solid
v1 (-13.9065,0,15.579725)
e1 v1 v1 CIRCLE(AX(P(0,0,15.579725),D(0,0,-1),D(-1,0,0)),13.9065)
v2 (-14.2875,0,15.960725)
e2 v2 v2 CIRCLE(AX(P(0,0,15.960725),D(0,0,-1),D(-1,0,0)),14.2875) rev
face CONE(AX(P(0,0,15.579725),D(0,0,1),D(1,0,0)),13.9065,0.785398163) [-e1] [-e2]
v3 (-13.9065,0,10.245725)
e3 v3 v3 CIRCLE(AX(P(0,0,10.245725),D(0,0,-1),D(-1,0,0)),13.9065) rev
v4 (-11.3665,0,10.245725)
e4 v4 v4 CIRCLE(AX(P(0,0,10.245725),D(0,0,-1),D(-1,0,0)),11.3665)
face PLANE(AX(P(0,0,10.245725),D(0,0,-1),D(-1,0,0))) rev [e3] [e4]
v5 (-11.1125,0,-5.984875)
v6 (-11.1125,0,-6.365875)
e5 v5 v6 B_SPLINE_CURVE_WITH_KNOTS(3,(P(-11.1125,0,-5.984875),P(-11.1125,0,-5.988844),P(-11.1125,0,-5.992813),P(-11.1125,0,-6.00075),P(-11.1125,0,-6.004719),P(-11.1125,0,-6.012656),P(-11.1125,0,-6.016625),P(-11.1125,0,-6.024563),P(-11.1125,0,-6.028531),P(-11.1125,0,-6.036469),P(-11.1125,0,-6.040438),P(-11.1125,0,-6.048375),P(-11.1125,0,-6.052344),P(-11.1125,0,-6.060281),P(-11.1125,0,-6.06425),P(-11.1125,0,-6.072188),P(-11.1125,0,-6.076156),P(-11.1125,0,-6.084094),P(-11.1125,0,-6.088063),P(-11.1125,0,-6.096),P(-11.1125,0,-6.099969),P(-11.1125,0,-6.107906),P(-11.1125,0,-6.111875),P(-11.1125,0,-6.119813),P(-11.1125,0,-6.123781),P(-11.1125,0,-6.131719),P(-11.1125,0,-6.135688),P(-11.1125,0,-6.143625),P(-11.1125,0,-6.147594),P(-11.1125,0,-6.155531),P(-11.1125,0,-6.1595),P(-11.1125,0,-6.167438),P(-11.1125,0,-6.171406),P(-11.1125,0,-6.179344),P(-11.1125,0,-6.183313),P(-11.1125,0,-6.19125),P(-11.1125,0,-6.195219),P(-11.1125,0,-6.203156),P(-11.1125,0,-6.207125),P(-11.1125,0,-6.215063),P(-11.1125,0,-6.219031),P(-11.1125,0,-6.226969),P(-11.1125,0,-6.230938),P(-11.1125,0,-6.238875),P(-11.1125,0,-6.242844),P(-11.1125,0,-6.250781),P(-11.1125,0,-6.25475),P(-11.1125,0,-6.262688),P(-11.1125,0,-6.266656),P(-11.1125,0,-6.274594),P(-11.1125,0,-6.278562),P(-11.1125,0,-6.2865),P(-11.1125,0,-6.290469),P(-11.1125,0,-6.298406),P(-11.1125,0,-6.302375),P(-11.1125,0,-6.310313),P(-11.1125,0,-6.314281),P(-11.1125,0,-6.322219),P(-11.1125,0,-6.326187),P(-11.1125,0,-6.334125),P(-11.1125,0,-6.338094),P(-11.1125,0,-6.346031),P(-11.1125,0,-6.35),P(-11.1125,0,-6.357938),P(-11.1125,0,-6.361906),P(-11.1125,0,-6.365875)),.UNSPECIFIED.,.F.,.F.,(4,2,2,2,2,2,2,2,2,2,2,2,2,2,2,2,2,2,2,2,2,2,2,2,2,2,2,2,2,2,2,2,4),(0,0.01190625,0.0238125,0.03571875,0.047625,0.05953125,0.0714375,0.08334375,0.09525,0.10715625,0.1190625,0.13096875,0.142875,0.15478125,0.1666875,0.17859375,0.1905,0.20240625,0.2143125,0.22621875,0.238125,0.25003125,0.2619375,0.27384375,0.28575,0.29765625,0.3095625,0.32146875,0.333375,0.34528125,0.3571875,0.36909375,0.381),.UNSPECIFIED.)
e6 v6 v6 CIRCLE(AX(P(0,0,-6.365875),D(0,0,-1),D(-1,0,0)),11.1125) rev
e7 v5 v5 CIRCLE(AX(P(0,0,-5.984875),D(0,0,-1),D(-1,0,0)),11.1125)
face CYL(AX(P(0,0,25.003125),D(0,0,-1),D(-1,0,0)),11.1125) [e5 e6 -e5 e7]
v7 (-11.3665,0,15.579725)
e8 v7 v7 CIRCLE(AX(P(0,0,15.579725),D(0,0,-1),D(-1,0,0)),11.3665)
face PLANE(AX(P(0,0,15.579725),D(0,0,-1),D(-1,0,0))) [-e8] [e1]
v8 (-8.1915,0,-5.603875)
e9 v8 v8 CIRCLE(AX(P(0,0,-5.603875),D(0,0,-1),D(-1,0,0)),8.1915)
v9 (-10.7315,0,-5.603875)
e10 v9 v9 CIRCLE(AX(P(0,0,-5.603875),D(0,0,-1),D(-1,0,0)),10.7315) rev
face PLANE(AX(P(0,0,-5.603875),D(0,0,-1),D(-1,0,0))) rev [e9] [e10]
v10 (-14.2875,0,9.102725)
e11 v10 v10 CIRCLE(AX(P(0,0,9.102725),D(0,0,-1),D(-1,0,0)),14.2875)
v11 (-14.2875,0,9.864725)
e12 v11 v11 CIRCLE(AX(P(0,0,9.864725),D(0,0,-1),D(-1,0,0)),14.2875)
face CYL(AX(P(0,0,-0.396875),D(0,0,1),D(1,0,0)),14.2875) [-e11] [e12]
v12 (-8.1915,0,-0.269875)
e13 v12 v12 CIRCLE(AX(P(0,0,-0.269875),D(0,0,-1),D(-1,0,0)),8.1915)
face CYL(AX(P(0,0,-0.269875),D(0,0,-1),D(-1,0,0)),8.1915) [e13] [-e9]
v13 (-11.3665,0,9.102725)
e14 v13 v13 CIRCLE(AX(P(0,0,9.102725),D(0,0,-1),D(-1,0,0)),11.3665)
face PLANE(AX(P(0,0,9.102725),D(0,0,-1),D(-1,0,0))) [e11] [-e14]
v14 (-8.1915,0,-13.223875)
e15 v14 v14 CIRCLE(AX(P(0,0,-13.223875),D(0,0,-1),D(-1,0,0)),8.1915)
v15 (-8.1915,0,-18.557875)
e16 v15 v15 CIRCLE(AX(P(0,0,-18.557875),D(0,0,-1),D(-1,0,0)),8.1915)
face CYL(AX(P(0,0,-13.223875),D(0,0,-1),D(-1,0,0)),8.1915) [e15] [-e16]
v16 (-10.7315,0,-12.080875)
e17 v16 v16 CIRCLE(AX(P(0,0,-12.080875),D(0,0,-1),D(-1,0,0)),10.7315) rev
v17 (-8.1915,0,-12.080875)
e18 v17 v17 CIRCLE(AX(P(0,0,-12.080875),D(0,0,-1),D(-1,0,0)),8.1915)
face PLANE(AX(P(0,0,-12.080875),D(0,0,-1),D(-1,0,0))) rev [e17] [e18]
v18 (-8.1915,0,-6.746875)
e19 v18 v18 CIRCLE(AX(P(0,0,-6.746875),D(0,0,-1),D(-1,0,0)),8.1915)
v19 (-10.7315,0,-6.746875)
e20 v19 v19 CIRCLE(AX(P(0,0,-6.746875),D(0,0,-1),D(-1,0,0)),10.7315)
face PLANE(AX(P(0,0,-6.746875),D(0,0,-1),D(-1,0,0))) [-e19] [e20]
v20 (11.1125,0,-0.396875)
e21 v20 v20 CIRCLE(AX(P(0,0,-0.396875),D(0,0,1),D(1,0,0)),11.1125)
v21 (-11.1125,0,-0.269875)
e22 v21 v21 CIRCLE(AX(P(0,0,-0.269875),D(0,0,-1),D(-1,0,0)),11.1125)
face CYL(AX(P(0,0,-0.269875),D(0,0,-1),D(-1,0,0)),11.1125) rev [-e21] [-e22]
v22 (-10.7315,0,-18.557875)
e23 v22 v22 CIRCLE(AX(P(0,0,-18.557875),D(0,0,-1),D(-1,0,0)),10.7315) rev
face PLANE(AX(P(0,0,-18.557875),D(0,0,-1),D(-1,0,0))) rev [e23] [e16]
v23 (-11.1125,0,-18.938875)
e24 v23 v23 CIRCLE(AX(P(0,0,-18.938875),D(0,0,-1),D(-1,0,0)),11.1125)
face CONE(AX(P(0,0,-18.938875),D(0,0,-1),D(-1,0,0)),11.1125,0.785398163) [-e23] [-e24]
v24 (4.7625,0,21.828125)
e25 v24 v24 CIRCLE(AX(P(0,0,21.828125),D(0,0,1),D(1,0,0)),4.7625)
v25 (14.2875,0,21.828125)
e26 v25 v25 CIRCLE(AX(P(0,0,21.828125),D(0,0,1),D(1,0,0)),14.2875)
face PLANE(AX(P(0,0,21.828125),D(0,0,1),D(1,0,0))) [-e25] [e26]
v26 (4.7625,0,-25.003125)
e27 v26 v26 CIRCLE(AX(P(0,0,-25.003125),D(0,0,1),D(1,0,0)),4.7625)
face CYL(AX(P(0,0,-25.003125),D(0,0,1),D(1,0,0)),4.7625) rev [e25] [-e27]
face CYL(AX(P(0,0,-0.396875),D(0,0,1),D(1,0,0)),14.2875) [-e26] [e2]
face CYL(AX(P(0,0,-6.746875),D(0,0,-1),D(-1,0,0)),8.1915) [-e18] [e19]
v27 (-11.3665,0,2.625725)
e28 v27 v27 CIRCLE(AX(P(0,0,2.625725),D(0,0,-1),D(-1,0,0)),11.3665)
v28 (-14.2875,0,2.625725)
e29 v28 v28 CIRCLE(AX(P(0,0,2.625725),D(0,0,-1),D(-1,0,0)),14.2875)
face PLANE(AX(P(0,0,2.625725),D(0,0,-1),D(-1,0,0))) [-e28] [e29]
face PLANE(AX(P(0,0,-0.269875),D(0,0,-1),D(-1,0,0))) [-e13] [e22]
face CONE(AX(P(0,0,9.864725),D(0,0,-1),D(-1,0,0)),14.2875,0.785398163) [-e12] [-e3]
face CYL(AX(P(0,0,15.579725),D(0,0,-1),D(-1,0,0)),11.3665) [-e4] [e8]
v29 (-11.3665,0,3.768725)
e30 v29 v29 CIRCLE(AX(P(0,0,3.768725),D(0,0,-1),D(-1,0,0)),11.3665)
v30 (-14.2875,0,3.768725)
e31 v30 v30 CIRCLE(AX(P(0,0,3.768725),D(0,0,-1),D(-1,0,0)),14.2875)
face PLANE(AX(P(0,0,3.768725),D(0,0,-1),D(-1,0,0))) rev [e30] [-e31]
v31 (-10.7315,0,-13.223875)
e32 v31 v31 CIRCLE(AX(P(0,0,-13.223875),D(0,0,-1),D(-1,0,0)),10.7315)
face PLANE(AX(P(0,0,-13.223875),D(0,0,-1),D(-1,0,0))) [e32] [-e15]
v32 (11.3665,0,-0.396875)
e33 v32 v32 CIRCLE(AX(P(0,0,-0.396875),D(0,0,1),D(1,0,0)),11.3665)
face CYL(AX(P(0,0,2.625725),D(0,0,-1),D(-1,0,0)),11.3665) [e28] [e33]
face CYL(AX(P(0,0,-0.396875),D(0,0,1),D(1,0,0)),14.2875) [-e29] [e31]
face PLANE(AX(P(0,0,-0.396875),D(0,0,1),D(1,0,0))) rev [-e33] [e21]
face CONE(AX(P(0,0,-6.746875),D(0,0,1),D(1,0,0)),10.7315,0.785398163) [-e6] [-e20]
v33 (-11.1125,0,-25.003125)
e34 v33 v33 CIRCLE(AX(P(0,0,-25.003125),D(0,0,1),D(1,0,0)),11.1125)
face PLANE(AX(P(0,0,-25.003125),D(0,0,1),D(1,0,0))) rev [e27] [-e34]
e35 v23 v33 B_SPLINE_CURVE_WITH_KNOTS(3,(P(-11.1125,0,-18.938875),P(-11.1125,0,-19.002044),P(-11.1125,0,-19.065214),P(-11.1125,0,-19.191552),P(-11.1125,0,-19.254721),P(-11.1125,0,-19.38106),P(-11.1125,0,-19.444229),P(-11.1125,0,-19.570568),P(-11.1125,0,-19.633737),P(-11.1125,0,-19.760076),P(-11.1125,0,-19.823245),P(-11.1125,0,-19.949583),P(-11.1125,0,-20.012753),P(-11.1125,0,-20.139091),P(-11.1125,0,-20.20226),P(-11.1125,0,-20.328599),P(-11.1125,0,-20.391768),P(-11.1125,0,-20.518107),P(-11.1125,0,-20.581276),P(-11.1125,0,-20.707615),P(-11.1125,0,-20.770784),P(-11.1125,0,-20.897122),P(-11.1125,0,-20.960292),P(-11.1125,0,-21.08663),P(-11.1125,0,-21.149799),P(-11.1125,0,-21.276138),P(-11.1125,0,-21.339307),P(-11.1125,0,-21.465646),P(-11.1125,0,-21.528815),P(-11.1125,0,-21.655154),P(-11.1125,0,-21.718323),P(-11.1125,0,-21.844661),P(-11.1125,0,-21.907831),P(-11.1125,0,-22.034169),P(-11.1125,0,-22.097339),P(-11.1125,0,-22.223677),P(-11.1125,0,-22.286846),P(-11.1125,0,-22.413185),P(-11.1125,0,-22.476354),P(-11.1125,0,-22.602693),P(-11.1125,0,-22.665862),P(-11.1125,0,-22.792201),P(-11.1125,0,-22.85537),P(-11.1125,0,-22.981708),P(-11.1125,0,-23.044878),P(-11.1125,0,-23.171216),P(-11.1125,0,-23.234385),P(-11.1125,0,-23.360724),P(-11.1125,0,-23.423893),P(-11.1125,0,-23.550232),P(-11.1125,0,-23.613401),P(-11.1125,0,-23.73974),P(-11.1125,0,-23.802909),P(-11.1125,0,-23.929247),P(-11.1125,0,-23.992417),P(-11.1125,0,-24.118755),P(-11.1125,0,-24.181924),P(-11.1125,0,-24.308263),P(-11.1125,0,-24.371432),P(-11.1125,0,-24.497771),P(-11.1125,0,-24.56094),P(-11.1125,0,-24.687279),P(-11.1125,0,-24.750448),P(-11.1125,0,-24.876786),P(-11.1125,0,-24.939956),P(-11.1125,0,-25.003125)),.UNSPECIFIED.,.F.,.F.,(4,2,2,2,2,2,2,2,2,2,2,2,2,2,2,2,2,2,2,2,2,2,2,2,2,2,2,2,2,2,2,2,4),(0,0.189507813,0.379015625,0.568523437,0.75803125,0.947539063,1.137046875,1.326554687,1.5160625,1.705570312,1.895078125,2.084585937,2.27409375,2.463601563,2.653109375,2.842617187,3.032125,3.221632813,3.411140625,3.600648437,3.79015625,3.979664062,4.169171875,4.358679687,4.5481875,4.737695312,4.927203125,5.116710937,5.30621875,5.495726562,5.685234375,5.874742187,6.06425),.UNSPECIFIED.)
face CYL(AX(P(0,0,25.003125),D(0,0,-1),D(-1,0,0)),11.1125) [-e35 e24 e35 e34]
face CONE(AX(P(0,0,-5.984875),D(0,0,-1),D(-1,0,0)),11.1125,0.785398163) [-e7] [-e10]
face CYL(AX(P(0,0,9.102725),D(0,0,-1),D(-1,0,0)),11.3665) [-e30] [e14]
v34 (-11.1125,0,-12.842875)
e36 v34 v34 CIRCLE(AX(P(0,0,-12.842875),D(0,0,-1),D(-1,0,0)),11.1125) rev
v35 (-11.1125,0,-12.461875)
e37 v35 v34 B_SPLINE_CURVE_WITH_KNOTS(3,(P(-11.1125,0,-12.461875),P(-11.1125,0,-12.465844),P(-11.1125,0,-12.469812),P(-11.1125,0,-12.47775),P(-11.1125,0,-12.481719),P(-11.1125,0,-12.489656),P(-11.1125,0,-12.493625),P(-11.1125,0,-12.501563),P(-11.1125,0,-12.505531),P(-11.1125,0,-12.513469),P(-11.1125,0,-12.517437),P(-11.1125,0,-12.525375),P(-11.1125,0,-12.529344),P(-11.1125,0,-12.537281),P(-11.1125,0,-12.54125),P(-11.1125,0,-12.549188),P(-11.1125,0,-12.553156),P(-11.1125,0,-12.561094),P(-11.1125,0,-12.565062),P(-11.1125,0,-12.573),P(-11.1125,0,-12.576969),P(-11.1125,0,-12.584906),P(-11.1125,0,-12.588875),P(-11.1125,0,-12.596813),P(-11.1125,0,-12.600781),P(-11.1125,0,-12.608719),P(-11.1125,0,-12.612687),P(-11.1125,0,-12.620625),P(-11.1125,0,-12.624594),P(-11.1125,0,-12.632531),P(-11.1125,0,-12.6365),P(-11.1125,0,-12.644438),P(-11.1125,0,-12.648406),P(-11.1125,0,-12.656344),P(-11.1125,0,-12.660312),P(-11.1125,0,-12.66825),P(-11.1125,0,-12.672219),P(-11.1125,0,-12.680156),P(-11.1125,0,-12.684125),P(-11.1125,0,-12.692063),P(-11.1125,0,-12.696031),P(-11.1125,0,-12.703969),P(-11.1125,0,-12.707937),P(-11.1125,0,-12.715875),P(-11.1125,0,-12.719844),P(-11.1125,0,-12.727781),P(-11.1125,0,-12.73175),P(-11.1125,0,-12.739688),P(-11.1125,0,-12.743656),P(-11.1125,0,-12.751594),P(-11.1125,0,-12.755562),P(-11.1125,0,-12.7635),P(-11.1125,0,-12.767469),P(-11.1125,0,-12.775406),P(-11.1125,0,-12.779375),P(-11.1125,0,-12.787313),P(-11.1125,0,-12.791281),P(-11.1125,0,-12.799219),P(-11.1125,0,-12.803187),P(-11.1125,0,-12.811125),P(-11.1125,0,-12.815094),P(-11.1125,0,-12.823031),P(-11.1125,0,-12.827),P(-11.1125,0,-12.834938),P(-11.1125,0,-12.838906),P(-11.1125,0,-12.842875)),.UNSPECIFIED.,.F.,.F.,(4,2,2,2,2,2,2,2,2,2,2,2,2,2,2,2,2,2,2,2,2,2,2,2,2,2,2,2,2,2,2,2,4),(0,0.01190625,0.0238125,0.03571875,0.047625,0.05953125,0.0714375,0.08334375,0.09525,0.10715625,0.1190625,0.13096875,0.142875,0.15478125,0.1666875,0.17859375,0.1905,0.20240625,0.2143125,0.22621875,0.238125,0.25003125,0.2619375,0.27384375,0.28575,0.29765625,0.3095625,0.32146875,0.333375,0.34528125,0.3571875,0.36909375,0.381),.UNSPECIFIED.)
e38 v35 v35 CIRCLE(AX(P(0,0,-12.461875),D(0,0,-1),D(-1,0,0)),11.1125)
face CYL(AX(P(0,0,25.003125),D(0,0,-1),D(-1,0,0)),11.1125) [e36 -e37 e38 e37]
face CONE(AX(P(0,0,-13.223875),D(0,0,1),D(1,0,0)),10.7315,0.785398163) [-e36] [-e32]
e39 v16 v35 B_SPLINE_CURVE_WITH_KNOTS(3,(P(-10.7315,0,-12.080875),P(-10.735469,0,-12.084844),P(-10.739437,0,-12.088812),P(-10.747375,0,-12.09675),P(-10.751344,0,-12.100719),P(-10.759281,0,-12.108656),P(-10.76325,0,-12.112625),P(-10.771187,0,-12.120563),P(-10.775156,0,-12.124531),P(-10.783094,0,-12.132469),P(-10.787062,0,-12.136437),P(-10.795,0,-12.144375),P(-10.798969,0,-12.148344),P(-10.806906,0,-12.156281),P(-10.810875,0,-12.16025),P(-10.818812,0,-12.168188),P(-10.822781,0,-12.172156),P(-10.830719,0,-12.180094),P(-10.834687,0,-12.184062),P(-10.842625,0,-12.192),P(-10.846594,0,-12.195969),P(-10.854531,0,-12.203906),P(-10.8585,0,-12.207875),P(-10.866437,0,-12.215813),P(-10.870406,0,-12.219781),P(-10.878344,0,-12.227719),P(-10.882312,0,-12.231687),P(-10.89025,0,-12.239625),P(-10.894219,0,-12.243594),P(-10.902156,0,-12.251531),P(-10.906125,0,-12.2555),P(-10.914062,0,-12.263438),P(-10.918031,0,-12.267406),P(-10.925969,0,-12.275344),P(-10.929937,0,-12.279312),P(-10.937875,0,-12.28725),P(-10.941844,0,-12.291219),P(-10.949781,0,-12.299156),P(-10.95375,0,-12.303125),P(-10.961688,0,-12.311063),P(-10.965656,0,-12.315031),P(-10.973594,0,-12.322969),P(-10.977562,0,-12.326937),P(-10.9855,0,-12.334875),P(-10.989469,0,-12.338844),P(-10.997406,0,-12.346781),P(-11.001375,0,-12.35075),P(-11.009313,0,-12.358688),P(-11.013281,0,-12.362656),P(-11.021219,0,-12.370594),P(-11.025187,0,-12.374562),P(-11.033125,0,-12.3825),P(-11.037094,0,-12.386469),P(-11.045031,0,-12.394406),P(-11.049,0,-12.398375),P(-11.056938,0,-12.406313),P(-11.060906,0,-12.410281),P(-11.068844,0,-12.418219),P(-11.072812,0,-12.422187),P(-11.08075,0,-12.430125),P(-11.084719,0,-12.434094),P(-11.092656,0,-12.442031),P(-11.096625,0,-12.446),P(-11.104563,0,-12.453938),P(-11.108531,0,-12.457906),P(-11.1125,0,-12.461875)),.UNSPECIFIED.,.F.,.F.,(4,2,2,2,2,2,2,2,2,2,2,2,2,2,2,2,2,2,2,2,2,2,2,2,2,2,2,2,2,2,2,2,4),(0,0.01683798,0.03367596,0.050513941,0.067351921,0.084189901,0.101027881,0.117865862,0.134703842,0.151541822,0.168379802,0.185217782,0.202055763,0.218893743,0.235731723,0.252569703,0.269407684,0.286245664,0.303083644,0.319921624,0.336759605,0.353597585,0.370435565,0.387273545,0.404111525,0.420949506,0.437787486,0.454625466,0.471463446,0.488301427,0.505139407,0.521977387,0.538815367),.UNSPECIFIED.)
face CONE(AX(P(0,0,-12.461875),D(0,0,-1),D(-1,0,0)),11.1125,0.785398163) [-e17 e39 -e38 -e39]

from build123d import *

# Parameters (mm, degrees)
SKETCH1_R           = 11.1125
SKETCH1_R_2         = 3.2004
EXTRUDE1_DEPTH      = 25.003125
BOSS_EXTRUDE1_START = -25.4
SKETCH8_R           = 14.2875
SKETCH8_R_2         = 3.2004
BOSS_EXTRUDE1_DEPTH = 25.4
CUT_EXTRUDE1_START  = -3.175
SKETCH5_R           = 14.2875
SKETCH5_R_2         = 3.2004
CUT_EXTRUDE1_DEPTH  = 3.175
SKETCH6_R           = 4.7625
CUT_EXTRUDE2_DEPTH  = 52.004228149
CUT_EXTRUDE3_START  = -11.77925
SKETCH7_R           = 11.1125
SKETCH7_R_2         = 8.1915
CUT_EXTRUDE3_DEPTH  = 5.334
CHAMFER2_SIZE       = 0.381
CUT_EXTRUDE4_START  = 8.9154
SKETCH9_R           = 14.2875
SKETCH9_R_2         = 11.3665
CUT_EXTRUDE4_DEPTH  = 2.667
CHAMFER3_SIZE       = 0.381
LPATTERN2_COUNT     = 3
LPATTERN2_PITCH     = 6.477


# Read off the part's stored shape, not the designer's step: LPattern1
with BuildPart() as part:
    # Sketch1 → Extrude1 (new, symmetric)
    with BuildSketch(Plane.XY):
        with Locations(Location((0, 0, 0), (0, 0, 180))):
            Circle(SKETCH1_R)
        with Locations(Location((0, 0, 0), (0, 0, 180))):
            Circle(SKETCH1_R_2, mode=Mode.SUBTRACT)
    extrude(amount=EXTRUDE1_DEPTH, both=True)

    # Sketch8 → Boss-Extrude1 (add)
    with BuildSketch(Plane.XY.offset(25.003125).offset(BOSS_EXTRUDE1_START)):
        Circle(SKETCH8_R)
        with Locations(Location((0, 0, 0), (0, 0, 180))):
            Circle(SKETCH8_R_2, mode=Mode.SUBTRACT)
    extrude(amount=BOSS_EXTRUDE1_DEPTH)

    # Sketch5 → Cut-Extrude1 (cut)
    with BuildSketch(Plane.XY.offset(25.003125).offset(CUT_EXTRUDE1_START)):
        Circle(SKETCH5_R)
        with Locations(Location((0, 0, 0), (0, 0, 180))):
            Circle(SKETCH5_R_2, mode=Mode.SUBTRACT)
    extrude(amount=CUT_EXTRUDE1_DEPTH, mode=Mode.SUBTRACT)

    # Sketch6 → Cut-Extrude2 (cut, through all)
    with BuildSketch(Plane.XY.offset(21.828125)):
        Circle(SKETCH6_R)
    extrude(amount=-CUT_EXTRUDE2_DEPTH, mode=Mode.SUBTRACT)

    # Sketch7 → Cut-Extrude3 (cut)
    with BuildSketch(Plane(origin=(0, 0, -25.003125), x_dir=(-1, 0, 0), z_dir=(0, 0, -1)).offset(CUT_EXTRUDE3_START)):
        Circle(SKETCH7_R)
        Circle(SKETCH7_R_2, mode=Mode.SUBTRACT)
    extrude(amount=CUT_EXTRUDE3_DEPTH, mode=Mode.SUBTRACT)

    # Chamfer2
    chamfer2_edges = [part.edges().sort_by_distance(p)[0] for p in [
        (11.1125, 0, -13.223875),
        (11.1125, 0, -18.557875),
    ]]
    chamfer(chamfer2_edges, length=CHAMFER2_SIZE)

    # Sketch9 → Cut-Extrude4 (cut, symmetric)
    with BuildSketch(Plane(origin=(0, 0, 21.828125), x_dir=(-1, 0, 0), z_dir=(0, 0, -1)).offset(CUT_EXTRUDE4_START)):
        with Locations(Location((0, 0, 0), (0, 0, 180))):
            Circle(SKETCH9_R)
        Circle(SKETCH9_R_2, mode=Mode.SUBTRACT)
    cut_extrude4 = extrude(amount=CUT_EXTRUDE4_DEPTH, both=True, mode=Mode.SUBTRACT)

    # Chamfer3
    chamfer3_edges = [part.edges().sort_by_distance(p)[0] for p in [
        (-14.2875, 0, 15.579725),
        (-14.2875, 0, 10.245725),
    ]]
    chamfer(chamfer3_edges, length=CHAMFER3_SIZE)

    # LPattern1 outline → LPattern1 (revolve, cut)
    with BuildSketch(Plane.XZ):
        Polygon((11.1125, -0.269875), (8.1915, -0.269875), (8.1915, -5.603875), (10.7315, -5.603875), (11.1125, -5.984875), align=None)
        Polygon((11.1125, -12.461875), (11.1125, -6.365875), (10.7315, -6.746875), (8.1915, -6.746875), (8.1915, -12.080875), (10.7315, -12.080875), align=None)
    revolve(axis=Axis((0, 0, 0), (0, 0, 1)), mode=Mode.SUBTRACT)

    # LPattern2: Cut-Extrude4 ×3
    with Locations(*[(0, 0, -i * LPATTERN2_PITCH) for i in range(1, LPATTERN2_COUNT)]):
        add(cut_extrude4, mode=Mode.SUBTRACT)


solid = part.part
